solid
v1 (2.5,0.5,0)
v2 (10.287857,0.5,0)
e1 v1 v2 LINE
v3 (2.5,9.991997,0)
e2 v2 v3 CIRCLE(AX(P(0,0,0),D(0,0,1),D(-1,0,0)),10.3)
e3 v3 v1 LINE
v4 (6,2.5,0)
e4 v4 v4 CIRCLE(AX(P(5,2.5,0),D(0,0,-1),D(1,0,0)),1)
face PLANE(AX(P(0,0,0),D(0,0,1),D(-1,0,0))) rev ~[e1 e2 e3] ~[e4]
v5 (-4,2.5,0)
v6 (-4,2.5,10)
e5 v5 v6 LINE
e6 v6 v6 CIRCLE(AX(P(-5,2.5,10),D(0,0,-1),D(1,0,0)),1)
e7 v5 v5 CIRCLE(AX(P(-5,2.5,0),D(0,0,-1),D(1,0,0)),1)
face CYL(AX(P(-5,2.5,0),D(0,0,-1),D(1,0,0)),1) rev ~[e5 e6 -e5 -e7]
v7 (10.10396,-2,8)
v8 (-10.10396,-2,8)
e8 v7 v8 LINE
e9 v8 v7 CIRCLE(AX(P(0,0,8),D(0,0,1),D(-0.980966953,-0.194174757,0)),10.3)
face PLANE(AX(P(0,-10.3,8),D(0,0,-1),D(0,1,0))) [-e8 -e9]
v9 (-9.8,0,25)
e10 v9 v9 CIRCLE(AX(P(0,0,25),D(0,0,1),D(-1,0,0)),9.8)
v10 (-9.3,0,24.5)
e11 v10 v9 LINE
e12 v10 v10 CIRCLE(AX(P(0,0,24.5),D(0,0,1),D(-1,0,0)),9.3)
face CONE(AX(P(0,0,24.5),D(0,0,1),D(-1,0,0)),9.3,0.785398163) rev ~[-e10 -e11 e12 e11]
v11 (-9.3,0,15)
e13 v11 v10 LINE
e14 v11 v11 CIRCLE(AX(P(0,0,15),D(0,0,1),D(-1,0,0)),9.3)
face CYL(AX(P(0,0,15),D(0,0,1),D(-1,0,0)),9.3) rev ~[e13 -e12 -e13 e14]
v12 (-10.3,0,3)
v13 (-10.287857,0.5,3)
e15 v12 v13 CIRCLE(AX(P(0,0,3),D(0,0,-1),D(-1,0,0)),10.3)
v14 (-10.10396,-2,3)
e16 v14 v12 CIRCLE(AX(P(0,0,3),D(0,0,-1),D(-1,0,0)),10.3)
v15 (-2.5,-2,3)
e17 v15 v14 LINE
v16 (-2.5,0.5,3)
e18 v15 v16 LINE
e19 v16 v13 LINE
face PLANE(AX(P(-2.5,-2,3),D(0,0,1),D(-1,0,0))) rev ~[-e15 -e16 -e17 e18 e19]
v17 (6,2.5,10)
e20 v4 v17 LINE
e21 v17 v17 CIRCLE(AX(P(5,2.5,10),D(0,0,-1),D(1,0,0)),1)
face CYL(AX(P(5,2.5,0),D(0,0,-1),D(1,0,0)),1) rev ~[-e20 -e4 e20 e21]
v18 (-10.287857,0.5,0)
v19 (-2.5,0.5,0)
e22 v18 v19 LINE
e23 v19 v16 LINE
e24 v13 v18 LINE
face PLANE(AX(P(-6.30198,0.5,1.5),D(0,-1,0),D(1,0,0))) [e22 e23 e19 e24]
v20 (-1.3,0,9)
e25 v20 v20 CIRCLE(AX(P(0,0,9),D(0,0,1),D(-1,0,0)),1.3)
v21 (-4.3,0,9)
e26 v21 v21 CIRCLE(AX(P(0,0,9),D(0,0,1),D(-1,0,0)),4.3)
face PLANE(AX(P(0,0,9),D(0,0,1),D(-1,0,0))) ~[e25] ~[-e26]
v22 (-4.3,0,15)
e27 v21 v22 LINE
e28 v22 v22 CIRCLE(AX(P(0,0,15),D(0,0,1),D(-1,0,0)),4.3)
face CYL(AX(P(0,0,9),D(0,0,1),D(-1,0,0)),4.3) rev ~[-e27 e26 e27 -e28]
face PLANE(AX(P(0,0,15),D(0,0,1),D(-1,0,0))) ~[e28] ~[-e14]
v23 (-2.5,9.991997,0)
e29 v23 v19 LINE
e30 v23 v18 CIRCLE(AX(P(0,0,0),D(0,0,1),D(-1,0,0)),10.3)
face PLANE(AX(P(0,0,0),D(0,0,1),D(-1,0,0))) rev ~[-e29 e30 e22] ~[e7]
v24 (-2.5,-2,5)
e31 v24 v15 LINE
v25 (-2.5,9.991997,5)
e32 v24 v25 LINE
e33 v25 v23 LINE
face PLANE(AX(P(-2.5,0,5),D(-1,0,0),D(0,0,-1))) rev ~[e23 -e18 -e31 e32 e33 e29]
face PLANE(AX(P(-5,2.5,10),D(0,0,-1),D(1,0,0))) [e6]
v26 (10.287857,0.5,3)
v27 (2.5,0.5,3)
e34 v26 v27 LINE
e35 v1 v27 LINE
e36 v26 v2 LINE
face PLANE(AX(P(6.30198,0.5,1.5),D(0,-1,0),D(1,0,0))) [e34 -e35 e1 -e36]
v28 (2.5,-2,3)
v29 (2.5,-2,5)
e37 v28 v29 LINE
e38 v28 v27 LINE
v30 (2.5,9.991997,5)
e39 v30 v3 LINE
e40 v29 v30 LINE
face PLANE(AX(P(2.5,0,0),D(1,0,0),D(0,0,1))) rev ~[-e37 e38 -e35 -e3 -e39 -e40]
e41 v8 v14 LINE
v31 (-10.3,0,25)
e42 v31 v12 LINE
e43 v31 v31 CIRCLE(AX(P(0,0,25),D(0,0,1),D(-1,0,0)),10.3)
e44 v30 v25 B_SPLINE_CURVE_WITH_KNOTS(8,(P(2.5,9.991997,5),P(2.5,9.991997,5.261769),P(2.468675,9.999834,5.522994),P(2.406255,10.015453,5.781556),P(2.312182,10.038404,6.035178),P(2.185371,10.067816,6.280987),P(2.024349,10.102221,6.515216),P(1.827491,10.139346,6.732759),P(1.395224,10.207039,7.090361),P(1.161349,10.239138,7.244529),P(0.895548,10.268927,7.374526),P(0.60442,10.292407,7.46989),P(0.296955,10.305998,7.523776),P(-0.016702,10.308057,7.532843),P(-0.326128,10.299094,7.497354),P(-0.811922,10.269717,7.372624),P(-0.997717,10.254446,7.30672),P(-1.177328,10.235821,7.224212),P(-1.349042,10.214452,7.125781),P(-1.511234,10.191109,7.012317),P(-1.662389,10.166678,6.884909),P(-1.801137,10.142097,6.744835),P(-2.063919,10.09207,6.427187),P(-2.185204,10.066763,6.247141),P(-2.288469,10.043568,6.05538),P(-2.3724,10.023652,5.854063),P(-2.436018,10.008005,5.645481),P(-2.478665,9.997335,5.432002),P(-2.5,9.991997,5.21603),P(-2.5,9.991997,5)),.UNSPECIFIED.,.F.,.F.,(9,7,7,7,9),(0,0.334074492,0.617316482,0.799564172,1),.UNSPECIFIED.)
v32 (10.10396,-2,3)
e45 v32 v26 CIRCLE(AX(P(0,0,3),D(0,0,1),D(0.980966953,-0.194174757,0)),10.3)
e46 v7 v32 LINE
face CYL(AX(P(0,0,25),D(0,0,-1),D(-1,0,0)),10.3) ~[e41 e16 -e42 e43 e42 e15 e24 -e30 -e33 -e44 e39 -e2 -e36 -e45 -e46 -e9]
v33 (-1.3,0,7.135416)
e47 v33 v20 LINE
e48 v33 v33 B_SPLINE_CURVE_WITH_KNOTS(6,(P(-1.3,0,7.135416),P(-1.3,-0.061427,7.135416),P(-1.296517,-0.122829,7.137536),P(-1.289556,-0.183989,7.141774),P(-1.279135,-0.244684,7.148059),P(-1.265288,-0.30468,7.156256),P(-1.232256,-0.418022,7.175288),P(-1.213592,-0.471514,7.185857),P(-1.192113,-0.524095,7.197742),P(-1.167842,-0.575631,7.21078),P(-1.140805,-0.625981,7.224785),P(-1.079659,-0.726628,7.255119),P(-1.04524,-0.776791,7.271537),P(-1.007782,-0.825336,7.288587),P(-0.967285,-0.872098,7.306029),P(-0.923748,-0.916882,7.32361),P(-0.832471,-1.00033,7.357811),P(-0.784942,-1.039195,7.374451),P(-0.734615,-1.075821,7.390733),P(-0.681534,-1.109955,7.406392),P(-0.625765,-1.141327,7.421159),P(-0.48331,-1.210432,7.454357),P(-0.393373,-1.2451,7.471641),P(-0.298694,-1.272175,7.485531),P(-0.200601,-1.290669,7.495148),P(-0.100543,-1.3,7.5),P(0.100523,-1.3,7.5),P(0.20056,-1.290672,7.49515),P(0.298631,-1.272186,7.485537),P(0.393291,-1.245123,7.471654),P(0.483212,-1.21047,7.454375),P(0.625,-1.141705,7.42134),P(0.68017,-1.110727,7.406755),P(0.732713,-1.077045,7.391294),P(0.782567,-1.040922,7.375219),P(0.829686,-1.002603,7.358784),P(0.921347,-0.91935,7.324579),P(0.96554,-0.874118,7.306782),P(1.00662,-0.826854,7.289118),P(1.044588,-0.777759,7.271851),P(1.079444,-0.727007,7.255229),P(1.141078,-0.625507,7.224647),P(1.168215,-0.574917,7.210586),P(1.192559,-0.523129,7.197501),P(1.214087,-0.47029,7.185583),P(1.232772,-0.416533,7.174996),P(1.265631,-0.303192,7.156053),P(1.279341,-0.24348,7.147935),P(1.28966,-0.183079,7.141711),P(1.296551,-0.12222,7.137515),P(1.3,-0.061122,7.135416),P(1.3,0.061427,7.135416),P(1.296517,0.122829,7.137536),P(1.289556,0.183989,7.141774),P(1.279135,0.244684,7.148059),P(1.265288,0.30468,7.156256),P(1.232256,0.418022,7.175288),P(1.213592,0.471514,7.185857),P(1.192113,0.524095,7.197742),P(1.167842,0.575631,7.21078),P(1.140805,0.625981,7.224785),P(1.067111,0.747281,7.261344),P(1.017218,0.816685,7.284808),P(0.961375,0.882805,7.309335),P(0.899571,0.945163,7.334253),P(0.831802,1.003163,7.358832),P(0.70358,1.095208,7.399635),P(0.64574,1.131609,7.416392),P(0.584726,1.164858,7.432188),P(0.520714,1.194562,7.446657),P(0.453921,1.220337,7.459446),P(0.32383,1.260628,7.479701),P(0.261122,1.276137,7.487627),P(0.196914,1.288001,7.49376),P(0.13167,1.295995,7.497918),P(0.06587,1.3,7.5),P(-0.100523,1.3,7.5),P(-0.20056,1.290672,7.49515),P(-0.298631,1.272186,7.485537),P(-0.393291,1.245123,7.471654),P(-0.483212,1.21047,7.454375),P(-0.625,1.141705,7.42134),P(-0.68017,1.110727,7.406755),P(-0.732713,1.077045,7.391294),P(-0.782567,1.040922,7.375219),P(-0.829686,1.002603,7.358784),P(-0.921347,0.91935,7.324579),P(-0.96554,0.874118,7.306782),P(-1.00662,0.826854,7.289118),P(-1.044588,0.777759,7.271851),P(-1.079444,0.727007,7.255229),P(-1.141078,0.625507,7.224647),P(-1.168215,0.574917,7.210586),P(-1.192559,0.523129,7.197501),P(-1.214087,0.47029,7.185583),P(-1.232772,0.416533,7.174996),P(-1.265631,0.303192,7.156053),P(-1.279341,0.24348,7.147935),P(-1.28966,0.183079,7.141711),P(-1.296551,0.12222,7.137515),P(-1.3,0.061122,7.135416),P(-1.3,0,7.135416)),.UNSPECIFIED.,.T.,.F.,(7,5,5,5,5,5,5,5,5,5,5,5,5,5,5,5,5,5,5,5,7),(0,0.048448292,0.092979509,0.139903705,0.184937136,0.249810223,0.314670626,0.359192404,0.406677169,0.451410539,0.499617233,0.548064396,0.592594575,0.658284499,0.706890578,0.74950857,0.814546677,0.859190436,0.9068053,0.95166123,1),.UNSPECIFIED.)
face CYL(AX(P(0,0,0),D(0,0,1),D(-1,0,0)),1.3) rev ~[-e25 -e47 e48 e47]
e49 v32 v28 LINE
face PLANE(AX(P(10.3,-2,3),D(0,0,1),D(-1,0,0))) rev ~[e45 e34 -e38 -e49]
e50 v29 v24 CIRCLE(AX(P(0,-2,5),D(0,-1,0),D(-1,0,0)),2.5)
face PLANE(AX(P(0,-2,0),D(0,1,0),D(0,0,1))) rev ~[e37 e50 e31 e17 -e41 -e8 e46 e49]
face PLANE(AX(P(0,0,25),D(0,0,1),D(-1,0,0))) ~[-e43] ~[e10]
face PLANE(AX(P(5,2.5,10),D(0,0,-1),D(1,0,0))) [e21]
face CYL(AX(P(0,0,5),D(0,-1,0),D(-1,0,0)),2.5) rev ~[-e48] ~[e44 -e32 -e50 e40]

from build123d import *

# Parameters (mm, degrees)
F3_DEPTH  = 18
F4_W      = 8.3
F4_H      = 8
F5_DEPTH  = 10.3
F6_W      = 7.6039596199
F6_H      = 3
F6_W_2    = 0.1960403801
F7_DEPTH  = 2.5
F8_SIZE   = 0.5
F9_R      = 1
F10_DEPTH = 10


# Not quite as in the source:
# - a feature names something its author has since deleted; it is built from what else it names


with BuildPart() as f1:
    # F0 (on Front) → F1 (revolve)
    with BuildSketch(Plane.XZ):
        Polygon((-10.3, 0), (-1.3, 0), (-1.3, 9), (-4.3, 9), (-4.3, 15), (-9.3, 15), (-9.3, 25), (-10.3, 25), align=None)
    revolve(axis=Axis((0, 0, 8.3402672317), (0, 0, 1)))

    # F2 (on Front) → F3 (cut, symmetric)
    with BuildSketch(Plane.XZ):
        with BuildLine():
            Line((-2.5, 5), (-2.5, 0))
            Line((-2.5, 0), (0, 0))
            Line((0, 0), (2.5, 0))
            Line((2.5, 0), (2.5, 5))
            ThreePointArc((2.5, 5), (0, 2.5), (-2.5, 5))
        make_face()
        with BuildLine():
            ThreePointArc((2.5, 5), (0, 7.5), (-2.5, 5))
            ThreePointArc((-2.5, 5), (0, 2.5), (2.5, 5))
        make_face()
    extrude(amount=F3_DEPTH, both=True, mode=Mode.SUBTRACT)

    # F4 (on Right) → F5 (cut, symmetric)
    with BuildSketch(Plane.YZ):
        with Locations((-6.15, 4)):
            Rectangle(F4_W, F4_H)
    extrude(amount=F5_DEPTH, both=True, mode=Mode.SUBTRACT)

    # F6 (on face) → F7 (cut)
    with BuildSketch(Plane.XZ.offset(2)):
        with Locations((6.3019798099, 1.5)):
            Rectangle(F6_W, F6_H)
        with Locations((-6.3019798099, 1.5)):
            Rectangle(F6_W, F6_H)
        with Locations((10.2019798099, 1.5)):
            Rectangle(F6_W_2, F6_H)
        with Locations((-10.2019798099, 1.5)):
            Rectangle(F6_W_2, F6_H)
    extrude(amount=-F7_DEPTH, mode=Mode.SUBTRACT)

    # F8
    f8_edges = [f1.edges().sort_by_distance(p)[0] for p in [
        (9.3, 0, 25),
    ]]
    chamfer(f8_edges, length=F8_SIZE)

    # F9 (on face) → F10 (cut)
    with BuildSketch(Plane(origin=(0, 0, 0), x_dir=(1, 0, 0), z_dir=(0, 0, -1))):
        with Locations((-5, -2.5)):
            Circle(F9_R)
        with Locations((5, -2.5)):
            Circle(F9_R)
    extrude(amount=-F10_DEPTH, mode=Mode.SUBTRACT)


solid = f1.part
